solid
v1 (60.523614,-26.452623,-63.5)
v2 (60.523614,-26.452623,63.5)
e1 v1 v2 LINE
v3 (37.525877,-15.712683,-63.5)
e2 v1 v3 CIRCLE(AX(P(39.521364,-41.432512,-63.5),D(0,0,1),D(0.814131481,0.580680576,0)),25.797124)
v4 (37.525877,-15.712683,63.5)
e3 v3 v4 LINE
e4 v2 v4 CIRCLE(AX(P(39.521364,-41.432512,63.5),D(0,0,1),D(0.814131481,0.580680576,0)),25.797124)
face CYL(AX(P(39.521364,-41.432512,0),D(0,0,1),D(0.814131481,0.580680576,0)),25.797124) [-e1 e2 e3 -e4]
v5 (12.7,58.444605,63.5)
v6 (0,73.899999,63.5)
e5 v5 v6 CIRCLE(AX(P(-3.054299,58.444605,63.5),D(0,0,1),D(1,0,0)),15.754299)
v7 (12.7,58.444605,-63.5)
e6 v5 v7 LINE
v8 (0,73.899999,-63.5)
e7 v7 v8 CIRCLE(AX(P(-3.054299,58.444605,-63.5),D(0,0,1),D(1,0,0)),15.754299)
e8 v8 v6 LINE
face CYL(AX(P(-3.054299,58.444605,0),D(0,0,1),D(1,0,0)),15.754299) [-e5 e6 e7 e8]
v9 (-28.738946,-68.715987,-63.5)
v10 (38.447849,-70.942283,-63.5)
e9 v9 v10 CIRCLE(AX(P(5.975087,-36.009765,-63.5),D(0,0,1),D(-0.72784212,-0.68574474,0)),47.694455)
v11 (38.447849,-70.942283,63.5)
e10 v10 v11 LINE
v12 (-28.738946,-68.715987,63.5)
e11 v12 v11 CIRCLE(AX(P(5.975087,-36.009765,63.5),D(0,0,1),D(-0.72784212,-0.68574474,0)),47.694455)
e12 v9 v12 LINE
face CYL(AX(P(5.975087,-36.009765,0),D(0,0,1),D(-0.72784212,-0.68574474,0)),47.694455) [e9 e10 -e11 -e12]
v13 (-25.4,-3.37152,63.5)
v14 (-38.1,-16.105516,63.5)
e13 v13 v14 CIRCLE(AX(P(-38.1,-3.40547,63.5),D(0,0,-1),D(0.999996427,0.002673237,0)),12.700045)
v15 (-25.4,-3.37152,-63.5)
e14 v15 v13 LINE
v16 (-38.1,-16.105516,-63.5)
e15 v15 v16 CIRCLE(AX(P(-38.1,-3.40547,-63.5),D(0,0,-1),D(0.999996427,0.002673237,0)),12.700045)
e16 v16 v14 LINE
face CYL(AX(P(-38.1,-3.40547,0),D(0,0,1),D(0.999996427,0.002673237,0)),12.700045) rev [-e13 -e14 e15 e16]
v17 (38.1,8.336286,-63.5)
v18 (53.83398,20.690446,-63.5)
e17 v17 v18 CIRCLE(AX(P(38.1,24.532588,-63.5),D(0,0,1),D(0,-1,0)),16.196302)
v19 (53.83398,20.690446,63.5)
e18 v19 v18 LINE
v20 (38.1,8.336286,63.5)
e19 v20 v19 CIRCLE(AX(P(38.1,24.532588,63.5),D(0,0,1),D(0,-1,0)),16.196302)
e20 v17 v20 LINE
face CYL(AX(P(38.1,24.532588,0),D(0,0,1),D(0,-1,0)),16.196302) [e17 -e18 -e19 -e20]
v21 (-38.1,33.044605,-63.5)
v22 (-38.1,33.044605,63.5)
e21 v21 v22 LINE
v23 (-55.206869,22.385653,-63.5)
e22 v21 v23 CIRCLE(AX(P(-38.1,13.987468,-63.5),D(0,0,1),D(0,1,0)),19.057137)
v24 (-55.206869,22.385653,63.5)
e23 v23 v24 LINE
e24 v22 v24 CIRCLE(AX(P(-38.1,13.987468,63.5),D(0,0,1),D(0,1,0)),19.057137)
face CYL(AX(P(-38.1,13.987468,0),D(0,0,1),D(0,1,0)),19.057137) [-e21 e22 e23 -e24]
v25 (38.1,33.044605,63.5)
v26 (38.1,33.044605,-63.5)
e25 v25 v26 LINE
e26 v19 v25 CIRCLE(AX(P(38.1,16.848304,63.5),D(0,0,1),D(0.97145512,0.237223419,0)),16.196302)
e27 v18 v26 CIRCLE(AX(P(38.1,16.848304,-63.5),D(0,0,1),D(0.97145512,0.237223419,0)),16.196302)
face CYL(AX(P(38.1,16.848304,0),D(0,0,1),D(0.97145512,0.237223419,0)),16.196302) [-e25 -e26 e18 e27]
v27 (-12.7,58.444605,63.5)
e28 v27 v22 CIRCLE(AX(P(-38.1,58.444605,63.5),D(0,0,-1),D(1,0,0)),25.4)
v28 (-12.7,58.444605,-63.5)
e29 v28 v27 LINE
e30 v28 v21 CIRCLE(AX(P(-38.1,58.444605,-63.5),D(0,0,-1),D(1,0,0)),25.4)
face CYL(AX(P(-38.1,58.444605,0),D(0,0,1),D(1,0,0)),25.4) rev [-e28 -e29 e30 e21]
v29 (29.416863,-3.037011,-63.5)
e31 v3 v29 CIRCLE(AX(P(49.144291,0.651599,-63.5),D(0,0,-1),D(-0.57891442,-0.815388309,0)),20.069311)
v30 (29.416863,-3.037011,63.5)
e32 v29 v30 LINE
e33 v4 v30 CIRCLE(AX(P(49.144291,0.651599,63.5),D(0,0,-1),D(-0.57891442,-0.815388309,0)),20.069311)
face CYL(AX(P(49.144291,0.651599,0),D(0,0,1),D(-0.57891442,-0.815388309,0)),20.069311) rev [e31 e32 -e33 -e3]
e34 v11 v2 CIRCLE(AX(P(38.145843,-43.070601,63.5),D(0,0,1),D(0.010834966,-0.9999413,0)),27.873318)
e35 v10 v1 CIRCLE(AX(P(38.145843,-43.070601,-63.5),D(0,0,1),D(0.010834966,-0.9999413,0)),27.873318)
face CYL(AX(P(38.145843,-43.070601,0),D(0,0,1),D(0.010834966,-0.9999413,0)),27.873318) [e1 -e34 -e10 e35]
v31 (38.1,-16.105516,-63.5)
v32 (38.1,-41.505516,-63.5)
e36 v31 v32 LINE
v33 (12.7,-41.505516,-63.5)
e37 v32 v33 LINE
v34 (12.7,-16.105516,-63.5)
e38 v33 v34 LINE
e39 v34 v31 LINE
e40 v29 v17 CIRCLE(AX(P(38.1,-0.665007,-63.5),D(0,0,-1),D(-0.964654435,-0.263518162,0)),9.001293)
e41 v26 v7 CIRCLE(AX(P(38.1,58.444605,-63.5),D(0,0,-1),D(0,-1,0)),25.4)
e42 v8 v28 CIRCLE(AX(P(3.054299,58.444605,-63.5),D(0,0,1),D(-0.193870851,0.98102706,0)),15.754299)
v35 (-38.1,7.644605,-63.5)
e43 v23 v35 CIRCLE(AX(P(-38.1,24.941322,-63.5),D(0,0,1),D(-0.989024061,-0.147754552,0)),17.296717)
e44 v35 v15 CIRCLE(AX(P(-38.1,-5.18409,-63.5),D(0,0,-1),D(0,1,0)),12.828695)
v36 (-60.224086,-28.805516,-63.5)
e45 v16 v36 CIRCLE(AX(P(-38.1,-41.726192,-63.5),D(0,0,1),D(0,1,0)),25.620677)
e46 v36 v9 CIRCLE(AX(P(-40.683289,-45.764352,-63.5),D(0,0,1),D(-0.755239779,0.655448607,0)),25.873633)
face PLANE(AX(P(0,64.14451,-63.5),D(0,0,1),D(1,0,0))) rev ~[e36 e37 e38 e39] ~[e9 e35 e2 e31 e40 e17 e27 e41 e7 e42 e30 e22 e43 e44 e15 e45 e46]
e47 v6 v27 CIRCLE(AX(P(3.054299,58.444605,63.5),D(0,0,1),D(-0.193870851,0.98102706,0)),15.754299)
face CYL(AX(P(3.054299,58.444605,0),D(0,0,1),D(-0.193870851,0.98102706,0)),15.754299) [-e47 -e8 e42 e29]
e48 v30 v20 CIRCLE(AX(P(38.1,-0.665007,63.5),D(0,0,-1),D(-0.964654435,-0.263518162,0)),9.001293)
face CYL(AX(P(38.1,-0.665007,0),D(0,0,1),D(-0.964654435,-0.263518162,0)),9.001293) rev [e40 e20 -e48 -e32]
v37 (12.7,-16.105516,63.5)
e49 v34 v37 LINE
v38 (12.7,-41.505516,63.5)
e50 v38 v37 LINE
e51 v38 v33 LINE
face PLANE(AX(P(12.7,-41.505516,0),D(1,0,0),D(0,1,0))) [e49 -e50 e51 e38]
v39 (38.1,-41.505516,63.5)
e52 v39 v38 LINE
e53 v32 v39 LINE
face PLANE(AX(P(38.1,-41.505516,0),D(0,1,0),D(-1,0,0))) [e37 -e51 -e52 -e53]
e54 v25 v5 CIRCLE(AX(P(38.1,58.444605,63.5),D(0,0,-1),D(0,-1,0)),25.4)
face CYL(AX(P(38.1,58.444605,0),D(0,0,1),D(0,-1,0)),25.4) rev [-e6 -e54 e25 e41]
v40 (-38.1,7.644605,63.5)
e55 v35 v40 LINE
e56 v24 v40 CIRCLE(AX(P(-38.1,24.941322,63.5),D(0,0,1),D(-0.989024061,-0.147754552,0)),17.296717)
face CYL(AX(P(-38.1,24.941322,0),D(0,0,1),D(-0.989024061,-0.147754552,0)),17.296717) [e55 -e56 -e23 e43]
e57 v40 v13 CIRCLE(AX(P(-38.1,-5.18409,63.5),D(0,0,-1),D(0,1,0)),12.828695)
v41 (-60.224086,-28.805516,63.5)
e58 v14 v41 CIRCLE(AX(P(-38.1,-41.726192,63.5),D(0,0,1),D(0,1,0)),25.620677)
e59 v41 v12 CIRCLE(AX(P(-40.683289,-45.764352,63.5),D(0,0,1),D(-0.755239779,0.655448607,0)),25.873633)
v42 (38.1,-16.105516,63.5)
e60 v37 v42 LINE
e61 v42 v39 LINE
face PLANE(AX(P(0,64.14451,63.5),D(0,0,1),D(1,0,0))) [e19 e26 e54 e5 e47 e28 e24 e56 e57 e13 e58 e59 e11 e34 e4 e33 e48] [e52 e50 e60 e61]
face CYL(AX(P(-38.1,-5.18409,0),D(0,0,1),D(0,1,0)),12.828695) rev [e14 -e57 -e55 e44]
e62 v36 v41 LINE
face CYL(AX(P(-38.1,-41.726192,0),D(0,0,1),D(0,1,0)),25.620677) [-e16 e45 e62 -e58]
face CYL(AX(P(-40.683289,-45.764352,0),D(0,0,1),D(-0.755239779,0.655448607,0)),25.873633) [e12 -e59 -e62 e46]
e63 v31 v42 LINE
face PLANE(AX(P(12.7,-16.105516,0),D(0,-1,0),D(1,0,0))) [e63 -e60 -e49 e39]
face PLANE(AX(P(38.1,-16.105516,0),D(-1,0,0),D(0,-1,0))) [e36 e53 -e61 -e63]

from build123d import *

# Parameters (mm, degrees)
F0_W     = 25.4
F0_H     = 25.4
F1_DEPTH = 63.5


with BuildPart() as f1:
    # F0 (on Top) → F1 (new body, symmetric)
    with BuildSketch(Plane.XY):
        with BuildLine():
            Line((-12.7, 58.4446051985), (0, 58.4446051985))
            Line((0, 58.4446051985), (12.7, 58.4446051985))
            ThreePointArc((12.7, 58.4446051985), (9.1177237853, 68.4465950708), (0, 73.8999992609))
            ThreePointArc((0, 73.8999992609), (-9.1177237853, 68.4465950708), (-12.7, 58.4446051985))
        make_face()
        Polygon((12.7, 58.4446051985), (0, 58.4446051985), (-12.7, 58.4446051985), (-12.7, 33.0446051985), (-38.1, 33.0446051985), (-38.1, 7.6446051985), (-12.7, 7.6446051985), (-12.7, -16.1055155754), (-12.7, -41.5055155754), (-12.7, -49.8682335019), (12.7, -49.8682335019), (12.7, -41.5055155754), (12.7, -16.1055155754), (12.7, 8.3362860605), (38.1, 8.3362860605), (38.1, 33.0446051985), (12.7, 33.0446051985), (12.7, 45.7446051985), align=None)
        with BuildLine():
            ThreePointArc((38.1, 33.0446051985), (20.1394877579, 40.4840929564), (12.7, 58.4446051985))
            Line((12.7, 58.4446051985), (12.7, 45.7446051985))
            Line((12.7, 45.7446051985), (12.7, 33.0446051985))
            Line((12.7, 33.0446051985), (38.1, 33.0446051985))
        make_face()
        with BuildLine():
            Line((-12.7, 33.0446051985), (-12.7, 58.4446051985))
            ThreePointArc((-12.7, 58.4446051985), (-20.1394877579, 40.4840929564), (-38.1, 33.0446051985))
            Line((-38.1, 33.0446051985), (-12.7, 33.0446051985))
        make_face()
        with BuildLine():
            ThreePointArc((53.8339801133, 20.6904456295), (48.1022920981, 29.5869981283), (38.1, 33.0446051985))
            Line((38.1, 33.0446051985), (38.1, 8.3362860605))
            ThreePointArc((38.1, 8.3362860605), (48.1022920981, 11.7938931307), (53.8339801133, 20.6904456295))
        make_face()
        with BuildLine():
            Line((-38.1, 7.6446051985), (-38.1, 33.0446051985))
            ThreePointArc((-38.1, 33.0446051985), (-48.1779241379, 30.1618280155), (-55.2068687975, 22.3856531084))
            ThreePointArc((-55.2068687975, 22.3856531084), (-49.3909637934, 11.8382480748), (-38.1, 7.6446051985))
        make_face()
        with BuildLine():
            ThreePointArc((29.4168628752, -3.037011018), (30.9454777105, 4.7972348951), (38.1, 8.3362860605))
            Line((38.1, 8.3362860605), (12.7, 8.3362860605))
            Line((12.7, 8.3362860605), (12.7, -16.1055155754))
            Line((12.7, -16.1055155754), (38.1, -16.1055155754))
            ThreePointArc((38.1, -16.1055155754), (37.8112363374, -15.9115868292), (37.5258770827, -15.7126825627))
            ThreePointArc((37.5258770827, -15.7126825627), (32.2384158105, -10.1636052268), (29.4168628752, -3.037011018))
        make_face()
        with BuildLine():
            Line((-12.7, 7.6446051985), (-38.1, 7.6446051985))
            ThreePointArc((-38.1, 7.6446051985), (-29.6939751713, 4.5068420563), (-25.4, -3.3715199679))
            ThreePointArc((-25.4, -3.3715199679), (-29.107716584, -12.3737471543), (-38.1, -16.1055155754))
            Line((-38.1, -16.1055155754), (-12.7, -16.1055155754))
            Line((-12.7, -16.1055155754), (-12.7, 7.6446051985))
        make_face()
        with BuildLine():
            ThreePointArc((60.5236142874, -26.4526233077), (50.436987874, -18.0585790132), (37.5258770827, -15.7126825627))
            ThreePointArc((37.5258770827, -15.7126825627), (37.8112363374, -15.9115868292), (38.1, -16.1055155754))
            Line((38.1, -16.1055155754), (38.1, -41.5055155754))
            Line((38.1, -41.5055155754), (12.7, -41.5055155754))
            Line((12.7, -41.5055155754), (12.7, -49.8682335019))
            Line((12.7, -49.8682335019), (-12.7, -49.8682335019))
            Line((-12.7, -49.8682335019), (-12.7, -41.5055155754))
            Line((-12.7, -41.5055155754), (-38.1, -41.5055155754))
            ThreePointArc((-38.1, -41.5055155754), (-37.9658127793, -56.6748011531), (-28.7389459174, -68.7159871021))
            ThreePointArc((-28.7389459174, -68.7159871021), (4.3955551034, -83.6780580167), (38.4478494525, -70.9422826767))
            ThreePointArc((38.4478494525, -70.9422826767), (63.1143336959, -55.4599639488), (60.5236142874, -26.4526233077))
        make_face()
        with Locations((-25.4, -28.8055155754)):
            Rectangle(F0_W, F0_H)
        with BuildLine():
            Line((-38.1, -41.5055155754), (-38.1, -16.1055155754))
            ThreePointArc((-38.1, -16.1055155754), (-50.8550498174, -19.5062062845), (-60.2240860462, -28.8055155754))
            ThreePointArc((-60.2240860462, -28.8055155754), (-50.8550498174, -38.1048248663), (-38.1, -41.5055155754))
        make_face()
        with BuildLine():
            ThreePointArc((-28.7389459174, -68.7159871021), (-37.9658127793, -56.6748011531), (-38.1, -41.5055155754))
            ThreePointArc((-38.1, -41.5055155754), (-50.8550498174, -38.1048248663), (-60.2240860462, -28.8055155754))
            ThreePointArc((-60.2240860462, -28.8055155754), (-60.9967813298, -61.7895486407), (-28.7389459174, -68.7159871021))
        make_face()
    extrude(amount=F1_DEPTH, both=True)


solid = f1.part
